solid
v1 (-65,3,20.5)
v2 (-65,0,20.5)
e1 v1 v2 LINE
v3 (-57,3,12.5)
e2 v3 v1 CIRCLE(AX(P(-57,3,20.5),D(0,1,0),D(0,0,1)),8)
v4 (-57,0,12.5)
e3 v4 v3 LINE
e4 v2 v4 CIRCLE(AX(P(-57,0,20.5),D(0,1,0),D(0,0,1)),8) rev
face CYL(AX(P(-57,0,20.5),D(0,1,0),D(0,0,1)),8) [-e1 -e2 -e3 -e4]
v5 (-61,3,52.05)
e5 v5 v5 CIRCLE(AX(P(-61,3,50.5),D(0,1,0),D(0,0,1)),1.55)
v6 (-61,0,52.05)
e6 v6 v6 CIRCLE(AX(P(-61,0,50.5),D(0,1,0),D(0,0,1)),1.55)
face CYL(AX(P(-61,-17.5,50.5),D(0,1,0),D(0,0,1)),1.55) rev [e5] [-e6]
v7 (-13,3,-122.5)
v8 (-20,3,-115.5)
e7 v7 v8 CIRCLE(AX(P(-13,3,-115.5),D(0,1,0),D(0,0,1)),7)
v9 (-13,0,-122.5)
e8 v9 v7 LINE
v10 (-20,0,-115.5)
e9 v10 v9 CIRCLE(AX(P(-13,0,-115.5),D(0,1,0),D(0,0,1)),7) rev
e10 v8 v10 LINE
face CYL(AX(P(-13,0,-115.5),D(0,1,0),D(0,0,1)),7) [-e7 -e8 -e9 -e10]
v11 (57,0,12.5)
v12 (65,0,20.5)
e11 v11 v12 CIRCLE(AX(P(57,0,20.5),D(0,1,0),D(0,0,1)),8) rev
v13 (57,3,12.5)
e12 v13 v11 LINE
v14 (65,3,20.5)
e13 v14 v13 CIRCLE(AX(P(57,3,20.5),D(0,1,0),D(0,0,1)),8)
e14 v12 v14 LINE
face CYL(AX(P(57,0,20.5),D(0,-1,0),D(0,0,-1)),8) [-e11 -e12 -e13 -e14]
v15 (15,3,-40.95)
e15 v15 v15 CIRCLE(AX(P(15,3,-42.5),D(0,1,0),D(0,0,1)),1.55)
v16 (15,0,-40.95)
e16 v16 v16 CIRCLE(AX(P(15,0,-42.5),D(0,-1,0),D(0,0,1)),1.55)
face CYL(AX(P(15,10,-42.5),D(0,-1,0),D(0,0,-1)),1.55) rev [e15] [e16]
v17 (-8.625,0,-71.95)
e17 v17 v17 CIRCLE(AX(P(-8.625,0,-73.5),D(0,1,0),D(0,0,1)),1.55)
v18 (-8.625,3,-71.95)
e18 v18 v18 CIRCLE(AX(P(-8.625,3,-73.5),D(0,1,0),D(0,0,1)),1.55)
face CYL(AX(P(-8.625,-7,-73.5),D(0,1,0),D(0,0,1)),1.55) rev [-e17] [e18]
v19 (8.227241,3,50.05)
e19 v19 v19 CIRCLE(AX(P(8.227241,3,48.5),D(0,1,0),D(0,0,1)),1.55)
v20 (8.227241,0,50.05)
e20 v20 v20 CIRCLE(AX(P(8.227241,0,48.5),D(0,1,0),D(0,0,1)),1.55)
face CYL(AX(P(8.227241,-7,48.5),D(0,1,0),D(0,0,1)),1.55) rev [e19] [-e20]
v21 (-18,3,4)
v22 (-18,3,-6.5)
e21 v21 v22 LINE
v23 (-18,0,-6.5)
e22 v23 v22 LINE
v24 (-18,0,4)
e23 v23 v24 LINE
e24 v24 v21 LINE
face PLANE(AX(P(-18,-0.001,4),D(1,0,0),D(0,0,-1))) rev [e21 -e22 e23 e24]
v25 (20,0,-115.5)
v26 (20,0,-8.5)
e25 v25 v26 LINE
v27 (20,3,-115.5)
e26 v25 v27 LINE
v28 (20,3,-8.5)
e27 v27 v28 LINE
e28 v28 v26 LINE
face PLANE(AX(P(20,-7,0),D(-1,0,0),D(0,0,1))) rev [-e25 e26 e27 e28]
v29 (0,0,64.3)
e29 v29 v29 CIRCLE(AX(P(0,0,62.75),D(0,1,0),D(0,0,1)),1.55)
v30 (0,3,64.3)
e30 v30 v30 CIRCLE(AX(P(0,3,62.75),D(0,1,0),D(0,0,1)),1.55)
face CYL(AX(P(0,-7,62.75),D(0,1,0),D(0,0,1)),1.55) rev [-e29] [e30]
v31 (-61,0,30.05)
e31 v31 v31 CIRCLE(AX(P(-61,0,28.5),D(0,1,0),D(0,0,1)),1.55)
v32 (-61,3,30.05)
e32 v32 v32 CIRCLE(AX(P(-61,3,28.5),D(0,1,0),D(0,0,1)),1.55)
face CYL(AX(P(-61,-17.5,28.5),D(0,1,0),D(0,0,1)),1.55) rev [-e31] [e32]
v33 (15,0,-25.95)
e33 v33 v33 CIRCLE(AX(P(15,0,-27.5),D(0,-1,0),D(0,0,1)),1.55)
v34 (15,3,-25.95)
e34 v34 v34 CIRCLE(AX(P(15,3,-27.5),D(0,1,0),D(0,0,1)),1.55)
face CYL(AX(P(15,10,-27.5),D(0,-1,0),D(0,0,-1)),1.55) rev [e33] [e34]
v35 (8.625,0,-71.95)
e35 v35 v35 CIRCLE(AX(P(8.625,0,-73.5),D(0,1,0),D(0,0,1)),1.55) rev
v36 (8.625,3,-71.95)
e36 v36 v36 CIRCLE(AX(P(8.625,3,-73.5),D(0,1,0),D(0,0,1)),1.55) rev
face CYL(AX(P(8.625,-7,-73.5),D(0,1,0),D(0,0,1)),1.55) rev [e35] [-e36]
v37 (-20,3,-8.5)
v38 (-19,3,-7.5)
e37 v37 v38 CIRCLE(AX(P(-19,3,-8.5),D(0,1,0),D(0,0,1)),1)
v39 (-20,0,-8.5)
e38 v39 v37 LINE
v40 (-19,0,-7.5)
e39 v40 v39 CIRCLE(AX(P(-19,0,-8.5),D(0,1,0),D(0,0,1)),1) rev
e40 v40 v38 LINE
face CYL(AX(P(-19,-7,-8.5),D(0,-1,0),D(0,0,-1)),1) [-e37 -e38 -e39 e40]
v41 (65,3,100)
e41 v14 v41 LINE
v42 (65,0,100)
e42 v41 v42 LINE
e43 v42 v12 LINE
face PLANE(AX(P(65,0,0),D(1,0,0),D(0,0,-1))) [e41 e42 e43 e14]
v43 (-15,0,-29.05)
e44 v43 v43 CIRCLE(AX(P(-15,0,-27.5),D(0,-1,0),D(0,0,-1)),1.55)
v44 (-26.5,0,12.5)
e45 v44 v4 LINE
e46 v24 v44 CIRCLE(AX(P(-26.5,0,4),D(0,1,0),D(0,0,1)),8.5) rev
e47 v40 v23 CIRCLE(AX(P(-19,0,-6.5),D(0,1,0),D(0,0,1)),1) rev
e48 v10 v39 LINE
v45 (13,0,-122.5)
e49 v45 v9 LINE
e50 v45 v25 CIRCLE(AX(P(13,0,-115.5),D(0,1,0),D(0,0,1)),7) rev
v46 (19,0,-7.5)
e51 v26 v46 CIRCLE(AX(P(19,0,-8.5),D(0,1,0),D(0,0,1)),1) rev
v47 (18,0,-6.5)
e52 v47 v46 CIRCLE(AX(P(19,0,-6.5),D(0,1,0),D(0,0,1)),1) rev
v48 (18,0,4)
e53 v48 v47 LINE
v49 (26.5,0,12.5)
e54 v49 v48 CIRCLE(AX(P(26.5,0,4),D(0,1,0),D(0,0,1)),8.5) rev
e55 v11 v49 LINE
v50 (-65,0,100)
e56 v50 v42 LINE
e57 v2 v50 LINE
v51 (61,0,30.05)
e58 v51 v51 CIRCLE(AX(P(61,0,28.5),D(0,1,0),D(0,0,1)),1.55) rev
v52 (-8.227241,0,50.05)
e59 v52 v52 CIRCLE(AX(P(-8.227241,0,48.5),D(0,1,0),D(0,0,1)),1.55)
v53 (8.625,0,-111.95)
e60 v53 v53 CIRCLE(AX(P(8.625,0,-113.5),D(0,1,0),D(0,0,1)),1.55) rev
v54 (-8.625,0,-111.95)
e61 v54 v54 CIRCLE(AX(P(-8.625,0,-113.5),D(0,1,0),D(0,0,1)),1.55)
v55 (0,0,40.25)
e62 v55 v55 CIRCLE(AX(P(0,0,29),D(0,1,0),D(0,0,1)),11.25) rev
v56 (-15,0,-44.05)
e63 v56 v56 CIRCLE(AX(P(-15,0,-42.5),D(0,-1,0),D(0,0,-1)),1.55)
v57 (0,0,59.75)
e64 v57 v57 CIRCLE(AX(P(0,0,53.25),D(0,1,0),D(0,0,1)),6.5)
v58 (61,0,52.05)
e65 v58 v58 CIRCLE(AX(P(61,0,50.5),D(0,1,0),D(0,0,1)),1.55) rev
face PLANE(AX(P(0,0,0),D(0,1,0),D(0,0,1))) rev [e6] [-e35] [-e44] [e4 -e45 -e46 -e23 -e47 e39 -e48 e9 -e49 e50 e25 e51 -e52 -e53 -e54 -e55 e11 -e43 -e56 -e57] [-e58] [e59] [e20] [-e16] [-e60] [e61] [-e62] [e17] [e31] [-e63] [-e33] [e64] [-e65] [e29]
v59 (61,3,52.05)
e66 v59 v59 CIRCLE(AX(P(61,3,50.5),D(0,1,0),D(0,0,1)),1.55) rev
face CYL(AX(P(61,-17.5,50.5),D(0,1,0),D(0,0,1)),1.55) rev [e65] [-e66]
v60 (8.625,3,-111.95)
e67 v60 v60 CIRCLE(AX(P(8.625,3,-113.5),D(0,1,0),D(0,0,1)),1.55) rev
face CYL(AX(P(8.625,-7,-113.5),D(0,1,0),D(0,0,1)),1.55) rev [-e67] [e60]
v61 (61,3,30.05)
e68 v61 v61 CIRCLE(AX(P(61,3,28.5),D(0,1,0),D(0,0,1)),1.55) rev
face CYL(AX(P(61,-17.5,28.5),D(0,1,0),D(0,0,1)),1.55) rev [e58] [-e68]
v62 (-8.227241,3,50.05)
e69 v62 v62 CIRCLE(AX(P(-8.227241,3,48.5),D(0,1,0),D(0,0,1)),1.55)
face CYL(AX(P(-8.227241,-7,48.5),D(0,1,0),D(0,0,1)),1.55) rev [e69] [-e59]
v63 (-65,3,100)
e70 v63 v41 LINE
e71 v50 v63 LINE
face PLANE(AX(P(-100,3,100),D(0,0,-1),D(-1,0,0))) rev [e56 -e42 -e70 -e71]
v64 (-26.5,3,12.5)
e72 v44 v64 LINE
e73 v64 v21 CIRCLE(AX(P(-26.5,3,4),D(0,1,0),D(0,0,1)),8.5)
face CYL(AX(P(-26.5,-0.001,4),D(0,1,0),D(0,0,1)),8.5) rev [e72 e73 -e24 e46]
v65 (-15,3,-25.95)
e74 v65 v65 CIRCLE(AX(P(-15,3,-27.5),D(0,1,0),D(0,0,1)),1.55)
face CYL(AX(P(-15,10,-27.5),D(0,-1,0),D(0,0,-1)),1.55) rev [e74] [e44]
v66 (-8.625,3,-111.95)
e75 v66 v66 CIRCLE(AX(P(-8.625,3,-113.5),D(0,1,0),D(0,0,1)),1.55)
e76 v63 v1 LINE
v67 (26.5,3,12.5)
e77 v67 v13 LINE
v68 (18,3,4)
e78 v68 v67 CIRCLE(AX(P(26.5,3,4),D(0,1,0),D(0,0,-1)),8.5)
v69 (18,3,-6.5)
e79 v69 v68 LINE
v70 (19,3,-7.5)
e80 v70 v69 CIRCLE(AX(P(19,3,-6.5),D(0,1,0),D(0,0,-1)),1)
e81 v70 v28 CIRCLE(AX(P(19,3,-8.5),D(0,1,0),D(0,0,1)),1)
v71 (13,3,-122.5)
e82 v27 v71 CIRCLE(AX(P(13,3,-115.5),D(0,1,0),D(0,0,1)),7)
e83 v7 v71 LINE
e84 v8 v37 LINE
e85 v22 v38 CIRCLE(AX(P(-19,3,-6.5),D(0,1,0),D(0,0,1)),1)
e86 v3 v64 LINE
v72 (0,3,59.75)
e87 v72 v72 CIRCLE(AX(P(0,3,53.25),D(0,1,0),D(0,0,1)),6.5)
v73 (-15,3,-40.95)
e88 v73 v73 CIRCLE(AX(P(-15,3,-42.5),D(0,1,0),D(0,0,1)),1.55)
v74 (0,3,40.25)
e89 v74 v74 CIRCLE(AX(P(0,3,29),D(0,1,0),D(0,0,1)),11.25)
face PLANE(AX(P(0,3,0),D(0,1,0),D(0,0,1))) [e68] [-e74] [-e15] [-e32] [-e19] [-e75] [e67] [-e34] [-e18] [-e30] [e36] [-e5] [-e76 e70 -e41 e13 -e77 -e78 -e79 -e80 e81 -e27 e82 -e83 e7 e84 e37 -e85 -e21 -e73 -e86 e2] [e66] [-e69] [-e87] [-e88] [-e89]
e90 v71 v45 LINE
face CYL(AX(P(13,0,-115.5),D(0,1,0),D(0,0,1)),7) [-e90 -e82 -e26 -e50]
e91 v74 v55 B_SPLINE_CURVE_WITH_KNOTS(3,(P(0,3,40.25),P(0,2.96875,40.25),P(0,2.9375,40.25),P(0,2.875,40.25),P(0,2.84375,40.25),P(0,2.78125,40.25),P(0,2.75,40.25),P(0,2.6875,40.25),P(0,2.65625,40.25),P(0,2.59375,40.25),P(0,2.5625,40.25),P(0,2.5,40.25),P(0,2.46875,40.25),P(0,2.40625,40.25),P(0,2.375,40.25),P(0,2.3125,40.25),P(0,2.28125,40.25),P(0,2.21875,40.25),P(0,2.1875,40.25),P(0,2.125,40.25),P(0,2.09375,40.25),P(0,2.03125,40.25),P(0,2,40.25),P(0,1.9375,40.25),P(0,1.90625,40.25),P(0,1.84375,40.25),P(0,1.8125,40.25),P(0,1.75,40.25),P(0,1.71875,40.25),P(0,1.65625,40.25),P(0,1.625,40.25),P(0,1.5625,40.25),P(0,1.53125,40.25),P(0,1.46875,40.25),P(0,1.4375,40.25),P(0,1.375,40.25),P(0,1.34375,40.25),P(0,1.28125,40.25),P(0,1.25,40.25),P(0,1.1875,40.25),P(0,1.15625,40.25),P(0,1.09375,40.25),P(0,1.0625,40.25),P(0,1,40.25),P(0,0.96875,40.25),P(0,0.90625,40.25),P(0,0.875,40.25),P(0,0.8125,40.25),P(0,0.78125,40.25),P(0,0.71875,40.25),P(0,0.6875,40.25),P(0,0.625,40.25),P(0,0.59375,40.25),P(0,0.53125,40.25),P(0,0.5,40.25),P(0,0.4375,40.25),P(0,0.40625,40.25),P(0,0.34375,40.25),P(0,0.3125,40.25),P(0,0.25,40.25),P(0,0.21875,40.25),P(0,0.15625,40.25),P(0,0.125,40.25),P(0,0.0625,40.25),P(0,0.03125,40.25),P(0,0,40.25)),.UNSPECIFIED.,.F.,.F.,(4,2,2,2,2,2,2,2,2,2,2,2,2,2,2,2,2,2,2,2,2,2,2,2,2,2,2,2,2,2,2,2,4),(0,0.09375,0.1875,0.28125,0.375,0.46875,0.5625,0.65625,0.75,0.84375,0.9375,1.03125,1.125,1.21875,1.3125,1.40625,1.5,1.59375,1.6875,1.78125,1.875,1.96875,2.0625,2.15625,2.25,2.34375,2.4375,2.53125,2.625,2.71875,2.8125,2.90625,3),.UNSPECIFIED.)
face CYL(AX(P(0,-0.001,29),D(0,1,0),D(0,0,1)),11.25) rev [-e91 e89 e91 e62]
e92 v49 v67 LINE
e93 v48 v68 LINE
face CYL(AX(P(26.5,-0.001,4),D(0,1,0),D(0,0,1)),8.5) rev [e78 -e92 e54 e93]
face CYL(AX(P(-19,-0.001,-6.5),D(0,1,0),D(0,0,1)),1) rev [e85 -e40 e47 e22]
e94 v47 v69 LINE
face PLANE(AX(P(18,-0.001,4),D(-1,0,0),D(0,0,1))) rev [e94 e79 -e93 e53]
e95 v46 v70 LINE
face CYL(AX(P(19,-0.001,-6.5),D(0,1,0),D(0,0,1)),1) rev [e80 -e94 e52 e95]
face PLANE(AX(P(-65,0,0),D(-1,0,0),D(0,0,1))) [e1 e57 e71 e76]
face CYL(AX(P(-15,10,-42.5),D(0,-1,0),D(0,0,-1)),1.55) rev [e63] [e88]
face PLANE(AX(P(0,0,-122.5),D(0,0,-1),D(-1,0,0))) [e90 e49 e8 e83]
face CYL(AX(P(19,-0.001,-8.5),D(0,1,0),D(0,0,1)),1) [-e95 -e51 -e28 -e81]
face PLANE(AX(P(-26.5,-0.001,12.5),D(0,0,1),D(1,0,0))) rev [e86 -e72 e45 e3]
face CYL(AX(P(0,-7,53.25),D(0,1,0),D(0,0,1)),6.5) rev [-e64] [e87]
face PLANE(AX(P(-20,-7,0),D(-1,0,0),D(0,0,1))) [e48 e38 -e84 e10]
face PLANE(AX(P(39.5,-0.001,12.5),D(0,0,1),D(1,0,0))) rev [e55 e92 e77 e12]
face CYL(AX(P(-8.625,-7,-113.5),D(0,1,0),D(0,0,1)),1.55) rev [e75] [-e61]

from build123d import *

# Parameters (mm, degrees)
SKETCH_1_W              = 200
SKETCH_1_H              = 200
EXTRUDE_1_DEPTH         = 3
SKETCH_2_R              = 1.5
CUT_EXTRUDE_2_DEPTH     = 10
CUT_EXTRUDE_3_DEPTH     = 10
SKETCH_6_R              = 1.55
CUT_EXTRUDE_3_1_1_DEPTH = 10
CUT_EXTRUDE_6_REACH     = 111.495
SKETCH_11_R             = 1.5
CUT_EXTRUDE_22_5_REACH  = 111.495
SKETCH_4_R              = 11.25
FILLET_1_R              = 1
SKETCH_12_W             = 40
SKETCH_12_H             = 3
EXTRUDE_2_DEPTH         = 75
FILLET_2_R              = 7
SKETCH_13_R             = 1.55
CUT_EXTRUDE_3_1_DEPTH   = 10
SKETCH_16_R             = 1.55
SKETCH_16_R_2           = 6.5
CUT_EXTRUDE_6242_DEPTH  = 10
SKETCH_18_W             = 87.5
SKETCH_18_H             = 3
EXTRUDE_3_DEPTH         = 20.5
SKETCH_19_W             = 87.5
SKETCH_19_H             = 3
EXTRUDE_4_DEPTH         = 20.5
SKETCH_7_R              = 1.55
CUT_EXTRUDE_7_DEPTH     = 20.5
FILLET_3_R              = 8


with BuildPart() as part:
    # 草图1 → 凸台-拉伸1 (new body)
    with BuildSketch(Plane(origin=(0, 0, 0), x_dir=(1, 0, 0), z_dir=(0, 1, 0))):
        Rectangle(SKETCH_1_W, SKETCH_1_H)
    extrude(amount=EXTRUDE_1_DEPTH)

    # 草图2 → 切除-拉伸2 (cut)
    with BuildSketch(Plane(origin=(0, 3, 0), x_dir=(1, 0, 0), z_dir=(0, 1, 0))):
        with Locations(Location((29.5, 9.5, 0), (0, 0, 270))):
            Circle(SKETCH_2_R)
        with Locations(Location((21.5, 0, 0), (0, 0, 270))):
            Circle(SKETCH_2_R)
        with Locations(Location((29.5, -9.5, 0), (0, 0, 270))):
            Circle(SKETCH_2_R)
        with Locations(Location((37.5, 0, 0), (0, 0, 270))):
            Circle(SKETCH_2_R)
        with Locations(Location((-29.5, -9.5, 0), (0, 0, 270))):
            Circle(SKETCH_2_R)
        with Locations(Location((-37.5, 0, 0), (0, 0, 270))):
            Circle(SKETCH_2_R)
        with Locations(Location((-21.5, 0, 0), (0, 0, 270))):
            Circle(SKETCH_2_R)
        with Locations(Location((-29.5, 9.5, 0), (0, 0, 270))):
            Circle(SKETCH_2_R)
    extrude(amount=-CUT_EXTRUDE_2_DEPTH, mode=Mode.SUBTRACT)

    # 草图5 → 切除-拉伸3 (cut)
    with BuildSketch(Plane(origin=(0, 3, 0), x_dir=(1, 0, 0), z_dir=(0, 1, 0))):
        with BuildLine():
            Line((-100, -100), (-44.5, -100))
            Line((-44.5, -100), (-44.5, 0))
            ThreePointArc((-44.5, 0), (-40.212142643, 10.5), (-29.8, 14.9969997))
            ThreePointArc((-29.8, 14.9969997), (-22.858571571, 17.9949995), (-20, 24.9949995))
            Line((-20, 24.9949995), (-20, 47.5))
            Line((-20, 47.5), (0, 47.5))
            Line((0, 47.5), (20, 47.5))
            Line((20, 47.5), (20, 24.9949995))
            ThreePointArc((20, 24.9949995), (22.858571571, 17.9949995), (29.8, 14.9969997))
            ThreePointArc((29.8, 14.9969997), (40.212142643, 10.5), (44.5, 0))
            Line((44.5, 0), (44.5, -100))
            Line((44.5, -100), (100, -100))
            Line((100, -100), (100, 100))
            Line((100, 100), (-100, 100))
            Line((-100, 100), (-100, -100))
        make_face()
    extrude(amount=-CUT_EXTRUDE_3_DEPTH, mode=Mode.SUBTRACT)

    # 草图6 → φ3.1通孔1 (cut)
    with BuildSketch(Plane.XZ):
        with Locations(Location((-15, -42.5, 0), (0, 0, 270))):
            Circle(SKETCH_6_R)
        with Locations(Location((-15, -27.5, 0), (0, 0, 270))):
            Circle(SKETCH_6_R)
        with Locations(Location((15, -27.5, 0), (0, 0, 90))):
            Circle(SKETCH_6_R)
        with Locations(Location((15, -42.5, 0), (0, 0, 90))):
            Circle(SKETCH_6_R)
    extrude(amount=-CUT_EXTRUDE_3_1_1_DEPTH, mode=Mode.SUBTRACT)

    # 草图11 → 切除-拉伸6 (cut, up to next)
    with BuildSketch(Plane(origin=(0, 3, 0), x_dir=(1, 0, 0), z_dir=(0, 1, 0)), mode=Mode.PRIVATE) as cut_extrude_6_sk1:
        with BuildLine():
            Line((44.5, -17.5), (44.5, -100))
            Line((44.5, -100), (101.133062566, -100))
            Line((101.133062566, -100), (101.133062566, 47.5))
            Line((101.133062566, 47.5), (20, 47.5))
            Line((20, 47.5), (20, 7.5))
            Line((20, 7.5), (19, 7.5))
            ThreePointArc((19, 7.5), (18.292893219, 7.207106781), (18, 6.5))
            Line((18, 6.5), (18, -4))
            ThreePointArc((18, -4), (20.48959236, -10.01040764), (26.5, -12.5))
            Line((26.5, -12.5), (39.5, -12.5))
            Line((39.5, -12.5), (44.5, -12.5))
            Line((44.5, -12.5), (44.5, -17.5))
        make_face()
        with Locations((29.5, -9.5)):
            Circle(SKETCH_11_R, mode=Mode.SUBTRACT)
        with Locations((21.5, 0)):
            Circle(SKETCH_11_R, mode=Mode.SUBTRACT)
    cut_extrude_6_tool1 = extrude(cut_extrude_6_sk1.sketch, amount=-CUT_EXTRUDE_6_REACH, mode=Mode.PRIVATE) & part.part
    # 草图11 → 切除-拉伸6 (cut, up to next)
    with BuildSketch(Plane(origin=(0, 3, 0), x_dir=(1, 0, 0), z_dir=(0, 1, 0)), mode=Mode.PRIVATE) as cut_extrude_6_sk2:
        with BuildLine():
            Line((-44.5, -17.5), (-44.5, -100))
            Line((-44.5, -100), (-101.133062566, -100))
            Line((-101.133062566, -100), (-101.133062566, 47.5))
            Line((-101.133062566, 47.5), (-20, 47.5))
            Line((-20, 47.5), (-20, 7.5))
            Line((-20, 7.5), (-19, 7.5))
            ThreePointArc((-19, 7.5), (-18.292893219, 7.207106781), (-18, 6.5))
            Line((-18, 6.5), (-18, -4))
            ThreePointArc((-18, -4), (-20.48959236, -10.01040764), (-26.5, -12.5))
            Line((-26.5, -12.5), (-39.5, -12.5))
            Line((-39.5, -12.5), (-44.5, -12.5))
            Line((-44.5, -12.5), (-44.5, -17.5))
        make_face()
    cut_extrude_6_tool2 = extrude(cut_extrude_6_sk2.sketch, amount=-CUT_EXTRUDE_6_REACH, mode=Mode.PRIVATE) & part.part
    add(cut_extrude_6_tool1.solids().sort_by_distance((66.686037, 3, 19.669577))[0], mode=Mode.SUBTRACT)
    add(cut_extrude_6_tool2.solids().sort_by_distance((-66.626911, 3, 19.648158))[0], mode=Mode.SUBTRACT)

    # 草图4 → φ22.5落弹孔 (cut, up to next)
    with BuildSketch(Plane(origin=(0, 3, 0), x_dir=(1, 0, 0), z_dir=(0, 1, 0)), mode=Mode.PRIVATE) as cut_extrude_22_5_sk1:
        with Locations(Location((0, -29, 0), (0, 0, 270))):
            Circle(SKETCH_4_R)
    cut_extrude_22_5_tool1 = extrude(cut_extrude_22_5_sk1.sketch, amount=-CUT_EXTRUDE_22_5_REACH, mode=Mode.PRIVATE) & part.part
    add(cut_extrude_22_5_tool1.solids().sort_by_distance((0, 3, 29))[0], mode=Mode.SUBTRACT)

    # 圆角1
    fillet_1_edges = [part.edges().sort_by_distance(p)[0] for p in [
        (-20, 1.5, -7.5),
        (20, 1.5, -7.5),
    ]]
    fillet(fillet_1_edges, radius=FILLET_1_R - 0.0001)  # a hair under: the kernel refuses the full size

    # 草图12 → 凸台-拉伸2 (add)
    with BuildSketch(Plane(origin=(0, 0, -47.5), x_dir=(-1, 0, 0), z_dir=(0, 0, -1))):
        with Locations((0, 1.5)):
            Rectangle(SKETCH_12_W, SKETCH_12_H)
    extrude(amount=EXTRUDE_2_DEPTH)

    # 圆角2
    fillet_2_edges = [part.edges().sort_by_distance(p)[0] for p in [
        (20, 1.5, -122.5),
        (-20, 1.5, -122.5),
    ]]
    fillet(fillet_2_edges, radius=FILLET_2_R)

    # 草图13 → φ3.1通孔 (cut)
    with BuildSketch(Plane(origin=(0, 3, 0), x_dir=(1, 0, 0), z_dir=(0, 1, 0))):
        with Locations(Location((-8.625, 113.5, 0), (0, 0, 270))):
            Circle(SKETCH_13_R)
        with Locations(Location((8.625, 113.5, 0), (0, 0, 270))):
            Circle(SKETCH_13_R)
        with Locations(Location((8.625, 73.5, 0), (0, 0, 270))):
            Circle(SKETCH_13_R)
        with Locations(Location((-8.625, 73.5, 0), (0, 0, 270))):
            Circle(SKETCH_13_R)
    extrude(amount=-CUT_EXTRUDE_3_1_DEPTH, mode=Mode.SUBTRACT)

    # 草图16 → Cut-Extrude 6242 (cut)
    with BuildSketch(Plane(origin=(0, 3, 0), x_dir=(1, 0, 0), z_dir=(0, 1, 0))):
        with Locations(Location((0, -62.75, 0), (0, 0, 270))):
            Circle(SKETCH_16_R)
        with Locations(Location((-8.227241336, -48.5, 0), (0, 0, 270))):
            Circle(SKETCH_16_R)
        with Locations(Location((8.227241336, -48.5, 0), (0, 0, 270))):
            Circle(SKETCH_16_R)
        with Locations(Location((0, -53.25, 0), (0, 0, 270))):
            Circle(SKETCH_16_R_2)
    extrude(amount=-CUT_EXTRUDE_6242_DEPTH, mode=Mode.SUBTRACT)

    # 草图18 → 凸台-拉伸3 (add)
    with BuildSketch(Plane.ZY.offset(44.5)):
        with Locations((56.25, 1.5)):
            Rectangle(SKETCH_18_W, SKETCH_18_H)
    extrude(amount=EXTRUDE_3_DEPTH)

    # 草图19 → 凸台-拉伸4 (add)
    with BuildSketch(Plane(origin=(44.5, 0, 0), x_dir=(0, 0, -1), z_dir=(1, 0, 0))):
        with Locations((-56.25, 1.5)):
            Rectangle(SKETCH_19_W, SKETCH_19_H)
    extrude(amount=EXTRUDE_4_DEPTH)

    # 草图7 → 切除-拉伸7 (cut)
    with BuildSketch(Plane(origin=(0, 3, 0), x_dir=(1, 0, 0), z_dir=(0, 1, 0))):
        with Locations(Location((-61, -28.5, 0), (0, 0, 270))):
            Circle(SKETCH_7_R)
        with Locations(Location((-61, -50.5, 0), (0, 0, 270))):
            Circle(SKETCH_7_R)
        with Locations(Location((61, -28.5, 0), (0, 0, 270))):
            Circle(SKETCH_7_R)
        with Locations(Location((61, -50.5, 0), (0, 0, 270))):
            Circle(SKETCH_7_R)
    extrude(amount=-CUT_EXTRUDE_7_DEPTH, mode=Mode.SUBTRACT)

    # 圆角3
    fillet_3_edges = [part.edges().sort_by_distance(p)[0] for p in [
        (-65, 1.5, 12.5),
        (65, 1.5, 12.5),
    ]]
    fillet(fillet_3_edges, radius=FILLET_3_R)


solid = part.part
